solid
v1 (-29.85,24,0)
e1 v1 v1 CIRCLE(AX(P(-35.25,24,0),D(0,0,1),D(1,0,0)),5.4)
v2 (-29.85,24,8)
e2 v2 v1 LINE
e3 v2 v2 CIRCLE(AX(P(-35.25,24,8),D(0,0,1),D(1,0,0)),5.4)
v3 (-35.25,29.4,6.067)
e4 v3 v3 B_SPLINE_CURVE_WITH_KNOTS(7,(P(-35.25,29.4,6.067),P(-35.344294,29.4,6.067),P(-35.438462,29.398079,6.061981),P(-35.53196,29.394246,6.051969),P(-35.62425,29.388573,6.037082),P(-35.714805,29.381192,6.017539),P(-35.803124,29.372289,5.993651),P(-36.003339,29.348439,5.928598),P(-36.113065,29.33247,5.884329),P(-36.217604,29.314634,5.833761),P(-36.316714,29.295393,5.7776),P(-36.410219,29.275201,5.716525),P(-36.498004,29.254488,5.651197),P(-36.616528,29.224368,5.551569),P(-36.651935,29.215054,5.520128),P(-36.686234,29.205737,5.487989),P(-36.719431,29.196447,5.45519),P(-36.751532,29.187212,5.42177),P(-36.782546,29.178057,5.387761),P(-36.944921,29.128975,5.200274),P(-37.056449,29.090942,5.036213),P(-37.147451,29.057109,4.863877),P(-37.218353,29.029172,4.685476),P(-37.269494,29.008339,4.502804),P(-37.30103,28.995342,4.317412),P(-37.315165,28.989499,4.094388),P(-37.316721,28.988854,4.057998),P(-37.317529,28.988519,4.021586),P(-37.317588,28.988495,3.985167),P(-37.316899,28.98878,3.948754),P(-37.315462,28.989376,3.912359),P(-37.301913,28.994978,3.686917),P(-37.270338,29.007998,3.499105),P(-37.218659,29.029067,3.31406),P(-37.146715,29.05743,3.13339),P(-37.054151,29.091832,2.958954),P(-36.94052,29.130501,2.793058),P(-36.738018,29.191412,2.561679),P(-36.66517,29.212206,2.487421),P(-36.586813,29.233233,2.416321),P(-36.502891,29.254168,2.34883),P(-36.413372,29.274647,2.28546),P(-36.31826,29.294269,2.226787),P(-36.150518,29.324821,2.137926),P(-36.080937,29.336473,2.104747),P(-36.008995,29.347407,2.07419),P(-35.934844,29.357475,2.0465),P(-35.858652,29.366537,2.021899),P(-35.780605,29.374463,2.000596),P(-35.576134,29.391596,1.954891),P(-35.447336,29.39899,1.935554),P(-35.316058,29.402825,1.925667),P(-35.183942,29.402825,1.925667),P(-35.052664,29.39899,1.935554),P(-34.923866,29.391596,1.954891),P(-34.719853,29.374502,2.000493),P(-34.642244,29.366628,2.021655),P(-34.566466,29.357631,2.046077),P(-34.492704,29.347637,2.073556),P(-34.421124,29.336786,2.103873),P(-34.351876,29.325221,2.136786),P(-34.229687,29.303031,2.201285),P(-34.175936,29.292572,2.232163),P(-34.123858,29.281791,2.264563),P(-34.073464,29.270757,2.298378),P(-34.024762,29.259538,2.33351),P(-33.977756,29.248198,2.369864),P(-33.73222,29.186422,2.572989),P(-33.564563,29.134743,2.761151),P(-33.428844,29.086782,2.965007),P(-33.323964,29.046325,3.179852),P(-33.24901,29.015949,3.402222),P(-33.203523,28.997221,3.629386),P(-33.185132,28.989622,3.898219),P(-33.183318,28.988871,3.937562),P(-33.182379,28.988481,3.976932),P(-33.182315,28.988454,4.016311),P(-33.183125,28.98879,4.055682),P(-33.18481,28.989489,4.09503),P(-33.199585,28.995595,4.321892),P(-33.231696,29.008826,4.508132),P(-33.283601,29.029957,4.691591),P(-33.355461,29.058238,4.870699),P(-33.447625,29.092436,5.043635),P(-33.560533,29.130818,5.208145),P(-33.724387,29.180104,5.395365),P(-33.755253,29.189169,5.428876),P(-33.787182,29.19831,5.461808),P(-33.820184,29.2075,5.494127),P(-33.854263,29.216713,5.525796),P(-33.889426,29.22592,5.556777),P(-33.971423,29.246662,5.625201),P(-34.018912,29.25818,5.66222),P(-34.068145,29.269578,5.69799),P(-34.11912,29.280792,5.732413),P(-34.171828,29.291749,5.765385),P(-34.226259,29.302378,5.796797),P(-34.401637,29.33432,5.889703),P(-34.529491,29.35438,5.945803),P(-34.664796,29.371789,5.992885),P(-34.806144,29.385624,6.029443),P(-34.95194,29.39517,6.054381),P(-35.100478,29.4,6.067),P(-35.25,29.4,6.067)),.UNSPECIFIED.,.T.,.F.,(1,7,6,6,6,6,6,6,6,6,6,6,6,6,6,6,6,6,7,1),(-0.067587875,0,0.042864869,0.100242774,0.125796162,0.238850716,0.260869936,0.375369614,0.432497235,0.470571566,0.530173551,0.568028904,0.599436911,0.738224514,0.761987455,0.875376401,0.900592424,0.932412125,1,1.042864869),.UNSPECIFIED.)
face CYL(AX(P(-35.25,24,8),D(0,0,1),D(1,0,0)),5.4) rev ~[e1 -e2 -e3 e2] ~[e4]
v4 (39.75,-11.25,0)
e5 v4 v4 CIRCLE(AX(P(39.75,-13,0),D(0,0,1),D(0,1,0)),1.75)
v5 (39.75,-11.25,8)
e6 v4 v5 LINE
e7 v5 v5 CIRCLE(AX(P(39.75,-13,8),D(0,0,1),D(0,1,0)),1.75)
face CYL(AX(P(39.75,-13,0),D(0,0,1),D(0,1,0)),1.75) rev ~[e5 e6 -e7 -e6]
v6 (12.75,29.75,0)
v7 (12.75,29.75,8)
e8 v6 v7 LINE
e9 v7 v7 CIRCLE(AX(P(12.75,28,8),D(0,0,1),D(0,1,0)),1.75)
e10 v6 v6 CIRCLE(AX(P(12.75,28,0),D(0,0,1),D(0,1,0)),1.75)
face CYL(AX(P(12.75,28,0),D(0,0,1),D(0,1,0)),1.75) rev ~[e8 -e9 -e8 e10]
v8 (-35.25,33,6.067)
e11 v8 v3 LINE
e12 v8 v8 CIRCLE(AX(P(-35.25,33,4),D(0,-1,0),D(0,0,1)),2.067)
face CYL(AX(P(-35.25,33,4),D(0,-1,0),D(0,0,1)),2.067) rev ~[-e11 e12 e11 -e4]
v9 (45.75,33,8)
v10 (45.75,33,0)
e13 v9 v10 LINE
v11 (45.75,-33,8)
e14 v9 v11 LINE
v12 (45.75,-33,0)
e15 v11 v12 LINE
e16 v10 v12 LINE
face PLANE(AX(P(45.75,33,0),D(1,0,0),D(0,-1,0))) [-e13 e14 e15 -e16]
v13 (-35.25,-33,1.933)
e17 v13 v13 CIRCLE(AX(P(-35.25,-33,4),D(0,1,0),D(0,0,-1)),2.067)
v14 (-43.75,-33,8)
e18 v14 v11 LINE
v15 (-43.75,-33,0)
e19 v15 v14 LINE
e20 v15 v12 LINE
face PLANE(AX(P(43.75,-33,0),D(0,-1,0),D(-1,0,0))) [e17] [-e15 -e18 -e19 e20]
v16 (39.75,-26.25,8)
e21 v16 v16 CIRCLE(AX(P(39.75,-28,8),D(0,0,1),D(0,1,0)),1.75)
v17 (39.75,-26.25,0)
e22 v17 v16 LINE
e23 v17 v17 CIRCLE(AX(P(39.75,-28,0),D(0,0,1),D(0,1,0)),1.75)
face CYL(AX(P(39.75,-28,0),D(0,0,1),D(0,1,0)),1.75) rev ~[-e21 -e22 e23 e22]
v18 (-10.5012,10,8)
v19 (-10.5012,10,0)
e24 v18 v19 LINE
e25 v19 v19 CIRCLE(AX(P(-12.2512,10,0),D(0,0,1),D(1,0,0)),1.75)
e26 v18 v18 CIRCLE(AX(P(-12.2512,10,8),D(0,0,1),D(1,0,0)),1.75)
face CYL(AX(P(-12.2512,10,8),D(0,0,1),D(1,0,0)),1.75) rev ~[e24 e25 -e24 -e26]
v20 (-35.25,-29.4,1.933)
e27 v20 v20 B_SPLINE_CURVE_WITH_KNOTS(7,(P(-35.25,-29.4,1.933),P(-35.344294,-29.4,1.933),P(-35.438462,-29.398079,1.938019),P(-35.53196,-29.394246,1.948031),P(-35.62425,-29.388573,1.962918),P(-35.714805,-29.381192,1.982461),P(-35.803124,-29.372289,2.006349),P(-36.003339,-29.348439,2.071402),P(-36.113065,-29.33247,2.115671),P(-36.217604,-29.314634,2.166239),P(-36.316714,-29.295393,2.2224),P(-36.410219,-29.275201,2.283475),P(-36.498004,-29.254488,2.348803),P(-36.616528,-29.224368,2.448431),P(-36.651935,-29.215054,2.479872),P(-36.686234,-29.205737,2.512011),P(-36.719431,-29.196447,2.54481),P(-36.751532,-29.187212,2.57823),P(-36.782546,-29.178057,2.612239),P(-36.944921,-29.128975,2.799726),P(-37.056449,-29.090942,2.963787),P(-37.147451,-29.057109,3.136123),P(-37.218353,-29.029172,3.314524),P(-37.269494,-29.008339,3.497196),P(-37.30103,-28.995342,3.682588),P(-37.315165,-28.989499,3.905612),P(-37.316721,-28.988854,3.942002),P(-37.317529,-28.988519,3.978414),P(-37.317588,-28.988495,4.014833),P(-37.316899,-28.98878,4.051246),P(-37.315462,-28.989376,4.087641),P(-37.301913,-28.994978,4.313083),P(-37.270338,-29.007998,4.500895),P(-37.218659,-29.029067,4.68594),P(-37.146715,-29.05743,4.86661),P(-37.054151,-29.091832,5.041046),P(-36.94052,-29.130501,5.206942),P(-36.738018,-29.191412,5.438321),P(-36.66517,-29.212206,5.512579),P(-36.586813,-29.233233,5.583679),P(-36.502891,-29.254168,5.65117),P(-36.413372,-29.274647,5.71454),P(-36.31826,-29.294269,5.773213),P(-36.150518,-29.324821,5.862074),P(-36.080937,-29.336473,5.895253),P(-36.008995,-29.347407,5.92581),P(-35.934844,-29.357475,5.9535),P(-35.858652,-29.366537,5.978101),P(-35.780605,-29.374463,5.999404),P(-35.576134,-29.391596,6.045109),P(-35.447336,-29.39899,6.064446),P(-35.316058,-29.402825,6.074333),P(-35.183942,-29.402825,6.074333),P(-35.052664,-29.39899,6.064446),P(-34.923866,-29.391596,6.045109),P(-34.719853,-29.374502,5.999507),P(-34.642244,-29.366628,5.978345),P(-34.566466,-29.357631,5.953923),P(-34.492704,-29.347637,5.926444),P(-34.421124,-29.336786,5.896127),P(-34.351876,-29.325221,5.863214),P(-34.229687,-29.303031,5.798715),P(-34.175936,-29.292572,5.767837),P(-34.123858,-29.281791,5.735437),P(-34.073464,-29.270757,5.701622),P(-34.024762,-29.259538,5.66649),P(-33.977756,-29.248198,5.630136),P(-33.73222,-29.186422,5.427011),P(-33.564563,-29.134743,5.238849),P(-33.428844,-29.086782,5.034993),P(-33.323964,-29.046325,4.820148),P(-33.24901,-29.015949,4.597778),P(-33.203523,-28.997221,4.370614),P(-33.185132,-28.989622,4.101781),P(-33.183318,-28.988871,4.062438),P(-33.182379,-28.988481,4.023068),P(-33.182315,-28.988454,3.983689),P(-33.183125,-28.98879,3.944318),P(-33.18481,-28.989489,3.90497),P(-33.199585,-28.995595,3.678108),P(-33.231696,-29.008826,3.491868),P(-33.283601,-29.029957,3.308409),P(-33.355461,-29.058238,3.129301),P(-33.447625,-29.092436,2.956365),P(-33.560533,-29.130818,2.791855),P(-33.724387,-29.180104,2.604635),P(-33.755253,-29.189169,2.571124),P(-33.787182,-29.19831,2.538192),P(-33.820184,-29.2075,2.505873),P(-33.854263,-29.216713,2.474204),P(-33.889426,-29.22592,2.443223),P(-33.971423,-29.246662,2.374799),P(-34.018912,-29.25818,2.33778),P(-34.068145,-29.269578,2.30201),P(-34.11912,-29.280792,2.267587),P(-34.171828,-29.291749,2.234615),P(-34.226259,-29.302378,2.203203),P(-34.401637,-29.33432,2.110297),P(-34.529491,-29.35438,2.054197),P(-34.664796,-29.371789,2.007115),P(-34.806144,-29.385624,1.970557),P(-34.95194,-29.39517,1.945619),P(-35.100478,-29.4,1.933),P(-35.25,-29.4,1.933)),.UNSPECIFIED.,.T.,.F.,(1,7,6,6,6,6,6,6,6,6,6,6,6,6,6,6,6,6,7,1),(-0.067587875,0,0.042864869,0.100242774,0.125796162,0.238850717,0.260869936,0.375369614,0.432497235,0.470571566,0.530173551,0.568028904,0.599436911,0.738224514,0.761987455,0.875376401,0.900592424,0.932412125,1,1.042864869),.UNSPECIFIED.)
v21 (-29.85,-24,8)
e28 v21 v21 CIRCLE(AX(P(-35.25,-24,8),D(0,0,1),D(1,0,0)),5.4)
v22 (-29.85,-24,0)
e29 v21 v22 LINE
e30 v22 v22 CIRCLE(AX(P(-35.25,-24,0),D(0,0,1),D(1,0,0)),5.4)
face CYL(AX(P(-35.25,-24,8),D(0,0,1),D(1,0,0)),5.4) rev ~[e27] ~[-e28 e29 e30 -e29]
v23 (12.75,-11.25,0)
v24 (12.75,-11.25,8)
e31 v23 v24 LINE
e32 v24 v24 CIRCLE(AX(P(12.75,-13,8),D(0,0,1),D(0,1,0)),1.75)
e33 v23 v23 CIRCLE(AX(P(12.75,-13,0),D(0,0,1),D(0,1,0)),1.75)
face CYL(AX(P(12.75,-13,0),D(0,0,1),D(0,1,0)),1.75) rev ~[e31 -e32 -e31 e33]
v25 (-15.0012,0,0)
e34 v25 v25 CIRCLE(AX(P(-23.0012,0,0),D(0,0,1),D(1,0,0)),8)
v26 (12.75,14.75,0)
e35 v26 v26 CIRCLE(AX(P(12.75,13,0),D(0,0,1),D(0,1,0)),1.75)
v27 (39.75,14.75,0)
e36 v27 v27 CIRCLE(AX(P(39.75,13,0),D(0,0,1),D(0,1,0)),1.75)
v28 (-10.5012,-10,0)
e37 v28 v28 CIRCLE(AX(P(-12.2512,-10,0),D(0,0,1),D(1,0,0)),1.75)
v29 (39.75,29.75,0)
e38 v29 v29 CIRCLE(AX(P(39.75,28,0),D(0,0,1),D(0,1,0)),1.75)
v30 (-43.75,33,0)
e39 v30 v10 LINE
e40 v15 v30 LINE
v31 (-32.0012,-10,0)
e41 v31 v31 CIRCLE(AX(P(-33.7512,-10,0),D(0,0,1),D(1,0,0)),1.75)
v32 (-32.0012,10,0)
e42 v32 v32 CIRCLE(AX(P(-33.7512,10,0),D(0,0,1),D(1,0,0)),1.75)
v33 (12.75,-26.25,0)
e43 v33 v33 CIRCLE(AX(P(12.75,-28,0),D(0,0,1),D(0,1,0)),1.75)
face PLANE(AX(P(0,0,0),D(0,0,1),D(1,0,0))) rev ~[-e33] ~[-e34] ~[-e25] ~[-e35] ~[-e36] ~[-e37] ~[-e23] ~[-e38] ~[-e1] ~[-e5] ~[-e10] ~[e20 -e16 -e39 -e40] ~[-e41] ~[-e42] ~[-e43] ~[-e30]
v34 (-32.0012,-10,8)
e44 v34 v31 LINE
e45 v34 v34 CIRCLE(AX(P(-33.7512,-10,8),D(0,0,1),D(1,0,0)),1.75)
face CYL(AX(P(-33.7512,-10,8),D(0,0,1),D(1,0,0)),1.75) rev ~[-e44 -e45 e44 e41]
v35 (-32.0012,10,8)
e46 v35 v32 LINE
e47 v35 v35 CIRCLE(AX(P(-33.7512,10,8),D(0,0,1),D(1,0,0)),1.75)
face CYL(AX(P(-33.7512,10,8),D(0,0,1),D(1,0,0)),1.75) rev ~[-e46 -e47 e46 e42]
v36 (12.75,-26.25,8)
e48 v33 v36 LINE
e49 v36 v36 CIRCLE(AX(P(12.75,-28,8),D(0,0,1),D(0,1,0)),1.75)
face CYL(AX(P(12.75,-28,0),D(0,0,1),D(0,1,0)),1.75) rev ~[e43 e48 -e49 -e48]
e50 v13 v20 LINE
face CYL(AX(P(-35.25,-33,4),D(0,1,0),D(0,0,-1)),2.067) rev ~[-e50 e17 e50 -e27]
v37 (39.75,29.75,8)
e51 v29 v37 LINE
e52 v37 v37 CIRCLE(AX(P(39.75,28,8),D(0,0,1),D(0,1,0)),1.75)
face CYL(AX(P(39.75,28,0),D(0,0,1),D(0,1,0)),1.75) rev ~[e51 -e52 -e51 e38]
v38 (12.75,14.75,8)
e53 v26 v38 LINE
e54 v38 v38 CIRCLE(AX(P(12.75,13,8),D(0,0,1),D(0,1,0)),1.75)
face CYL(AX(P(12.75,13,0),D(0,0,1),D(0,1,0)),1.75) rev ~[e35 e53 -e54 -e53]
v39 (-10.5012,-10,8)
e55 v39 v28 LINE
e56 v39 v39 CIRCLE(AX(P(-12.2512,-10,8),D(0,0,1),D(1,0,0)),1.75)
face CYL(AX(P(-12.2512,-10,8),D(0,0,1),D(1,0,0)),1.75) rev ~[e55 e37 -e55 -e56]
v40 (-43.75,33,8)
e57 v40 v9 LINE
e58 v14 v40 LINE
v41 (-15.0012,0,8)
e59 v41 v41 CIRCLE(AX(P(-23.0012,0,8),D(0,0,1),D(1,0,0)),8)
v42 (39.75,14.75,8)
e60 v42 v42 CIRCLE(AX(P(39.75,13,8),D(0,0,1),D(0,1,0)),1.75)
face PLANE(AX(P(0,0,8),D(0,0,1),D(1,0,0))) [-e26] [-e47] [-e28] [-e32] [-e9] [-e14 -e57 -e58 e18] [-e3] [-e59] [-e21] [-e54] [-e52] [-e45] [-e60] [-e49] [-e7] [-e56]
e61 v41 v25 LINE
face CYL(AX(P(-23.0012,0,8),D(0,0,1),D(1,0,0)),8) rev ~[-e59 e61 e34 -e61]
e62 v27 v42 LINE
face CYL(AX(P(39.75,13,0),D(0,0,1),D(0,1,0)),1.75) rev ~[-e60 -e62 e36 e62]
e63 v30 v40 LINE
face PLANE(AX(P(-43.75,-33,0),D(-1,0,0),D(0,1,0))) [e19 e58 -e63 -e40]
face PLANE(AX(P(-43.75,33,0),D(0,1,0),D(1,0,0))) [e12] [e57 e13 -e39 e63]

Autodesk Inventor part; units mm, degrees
ref_plane "YZ Plane" through (0, 0, 0) normal (1, 0, 0) x (0, 1, 0)
ref_plane "XZ Plane" through (0, 0, 0) normal (0, 1, 0) x (-1, 0, 0)
ref_plane "XY Plane" through (0, 0, 0) normal (0, 0, 1) x (1, 0, 0)
sketch "Sketch1" plane through (0, 0, 0) normal (0, 0, 1) x (1, 0, 0)
  line L0 (-43.75, 33) -> (43.75, 33)
  line L1 (43.75, 33) -> (43.75, -33)
  line L2 (43.75, -33) -> (-43.75, -33)
  line L3 (-43.75, -33) -> (-43.75, 33)
  point P0 (0, 0)
  point P1 (0, 33)
  point P2 (-43.75, 0)
  dimension "d0" = 87.5
  dimension "d1" = 66
extrude "Extrusion1" add sketch "Sketch1" along normal blind 8
sketch "Sketch4" plane through (0, 0, 8) normal (0, 0, 1) x (1, 0, 0)
  line L0 (43.75, 33) -> (-43.75, 33) projected
  line L1 (-43.75, 33) -> (-43.75, -33) projected
  circle A0 centre (-35.25, 24) radius 5.4
  circle A1 centre (-35.25, -24) radius 5.4
  line L2 (-43.75, -33) -> (43.75, -33) projected
  point P0 (0, 0)
  dimension "d27" = 8.5
  dimension "d28" = 9
  dimension "d29" = 10.8
  dimension "d30" = 9
extrude "Extrusion4" cut sketch "Sketch4" against normal through all
sketch "Sketch5" plane through (0, 0, 8) normal (0, 0, 1) x (1, 0, 0)
  circle A0 centre (-23.0012, 0) radius 4
  circle A1 centre (-23.0012, 0) radius 8
  line L0 (-43.75, 33) -> (-43.75, -33) projected
  line L1 (43.75, 33) -> (-43.75, 33) projected
  circle A2 centre (-23.0012, 0) radius 7 projected
  point P0 (0, 0)
  point P1 (-43.75, 0)
  dimension "d24" = 16
  dimension "d33" = 20.7488
extrude "Extrusion5" cut sketch "Sketch5" against normal through all contours A0 | A1 | A2
sketch "Sketch6" plane through (0, 0, 8) normal (0, 0, 1) x (1, 0, 0)
  circle A0 centre (-33.7512, 10) radius 1.75
  circle A1 centre (-12.2512, 10) radius 1.75
  circle A2 centre (-12.2512, -10) radius 1.75
  circle A3 centre (-33.7512, -10) radius 1.75
  line L0 (-33.7512, 10) -> (-12.2512, 10)
  line L1 (-12.2512, 10) -> (-12.2512, -10)
  line L2 (-12.2512, -10) -> (-33.7512, -10)
  line L3 (-33.7512, -10) -> (-33.7512, 10)
  line L4 (-33.7512, 10) -> (-12.2512, -10) construction
  line L5 (-12.2512, 10) -> (-33.7512, -10) construction
  circle A4 centre (-23.0012, 0) radius 8 projected
  line L6 (-43.75, 33) -> (-43.75, -33) projected
  point P0 (0, 0)
  point P1 (-23.0012, 0)
  dimension "d35" = 3.5
  dimension "d36" = 21.5
  dimension "d37" = 20
extrude "Extrusion6" cut sketch "Sketch6" against normal through all contours L0 L3 A0 | A0 L3 L0 | L0 L1 A1 | A1 L1 L0 | L3 L2 A3 | A3 L2 L3 | L1 L2 A2 | A2 L2 L1
sketch "Sketch7" plane through (0, 0, 8) normal (0, 0, 1) x (1, 0, 0)
  point P0 (0, 0)
sketch "Sketch8" plane through (0, 0, 0) normal (0, 0, -1) x (-1, 0, 0)
  line L0 (-35.75, -33) -> (-43.75, -33)
  line L1 (-43.75, -33) -> (-43.75, 33)
  line L2 (-43.75, 33) -> (-35.75, 33)
  line L3 (-35.75, 33) -> (-35.75, -33)
  line L4 (-8.75, -33) -> (-16.75, -33)
  line L5 (-16.75, -33) -> (-16.75, 33)
  line L6 (-16.75, 33) -> (-8.75, 33)
  line L7 (-8.75, 33) -> (-8.75, -33)
  line L8 (-44.55, -20.5) -> (-44.55, -29.5) projected
  point P0 (0, 0)
  point P1 (-39.75, -28)
  point P2 (-39.75, -13)
  point P3 (-39.75, 13)
  point P4 (-39.75, 28)
  dimension "d38" = 4
  dimension "d39" = 5
  dimension "d40" = 15
  dimension "d41" = 5
  dimension "d42" = 15
  dimension "d56" = 26
hole "Hole1" at (39.75, 28, 0) direction (0, 0, 1) diameter 3.5 end through all
move faces "Move1" translate (2, 0, 0) faces at (43.75, -11, 2.6667)
pattern_linear "Rectangular Pattern2" count 2 spacing 15 along (0, -1, 0) count 2 spacing 41 along (0, -1, 0) of "Hole1"
pattern_linear "Rectangular Pattern3" count 2 spacing 27 along (-1, 0, 0) of "Hole1", "Rectangular Pattern2"
sketch "Sketch10" plane through (-43.75, 33, 8) normal (0, 1, 0) x (1, 0, 0)
  line L0 (0, 8) -> (0, 0) projected
  point P0 (43.75, 8)
  point P1 (8.5, 4)
  point P2 (0, 4)
  dimension "d66" = 8.5
hole "Hole2" at (-35.25, 33, 4) direction (0, -1, 0) diameter 4.134 depth 7.45 tip angle 118 thread size "M5x0.8" class "6H" standard "ISO Metric profile"
sketch "Sketch11" plane through (-43.75, -33, 0) normal (0, -1, 0) x (1, 0, 0)
  line L0 (0, 0) -> (0, 8) projected
  point P0 (43.75, 0)
  point P1 (8.5, 4)
  point P2 (0, 4)
  dimension "d74" = 8.5
hole "Hole3" at (-35.25, -33, 4) direction (0, 1, 0) diameter 4.134 depth 7.45 tip angle 118 thread size "M5x0.8" class "6H" standard "ISO Metric profile"
equation "\"d30\" = d28"
equation "\"d41\" = d39"
equation "\"d42\" = d40"
properties part number "0005-10-011" material "Wood (Maple)"
